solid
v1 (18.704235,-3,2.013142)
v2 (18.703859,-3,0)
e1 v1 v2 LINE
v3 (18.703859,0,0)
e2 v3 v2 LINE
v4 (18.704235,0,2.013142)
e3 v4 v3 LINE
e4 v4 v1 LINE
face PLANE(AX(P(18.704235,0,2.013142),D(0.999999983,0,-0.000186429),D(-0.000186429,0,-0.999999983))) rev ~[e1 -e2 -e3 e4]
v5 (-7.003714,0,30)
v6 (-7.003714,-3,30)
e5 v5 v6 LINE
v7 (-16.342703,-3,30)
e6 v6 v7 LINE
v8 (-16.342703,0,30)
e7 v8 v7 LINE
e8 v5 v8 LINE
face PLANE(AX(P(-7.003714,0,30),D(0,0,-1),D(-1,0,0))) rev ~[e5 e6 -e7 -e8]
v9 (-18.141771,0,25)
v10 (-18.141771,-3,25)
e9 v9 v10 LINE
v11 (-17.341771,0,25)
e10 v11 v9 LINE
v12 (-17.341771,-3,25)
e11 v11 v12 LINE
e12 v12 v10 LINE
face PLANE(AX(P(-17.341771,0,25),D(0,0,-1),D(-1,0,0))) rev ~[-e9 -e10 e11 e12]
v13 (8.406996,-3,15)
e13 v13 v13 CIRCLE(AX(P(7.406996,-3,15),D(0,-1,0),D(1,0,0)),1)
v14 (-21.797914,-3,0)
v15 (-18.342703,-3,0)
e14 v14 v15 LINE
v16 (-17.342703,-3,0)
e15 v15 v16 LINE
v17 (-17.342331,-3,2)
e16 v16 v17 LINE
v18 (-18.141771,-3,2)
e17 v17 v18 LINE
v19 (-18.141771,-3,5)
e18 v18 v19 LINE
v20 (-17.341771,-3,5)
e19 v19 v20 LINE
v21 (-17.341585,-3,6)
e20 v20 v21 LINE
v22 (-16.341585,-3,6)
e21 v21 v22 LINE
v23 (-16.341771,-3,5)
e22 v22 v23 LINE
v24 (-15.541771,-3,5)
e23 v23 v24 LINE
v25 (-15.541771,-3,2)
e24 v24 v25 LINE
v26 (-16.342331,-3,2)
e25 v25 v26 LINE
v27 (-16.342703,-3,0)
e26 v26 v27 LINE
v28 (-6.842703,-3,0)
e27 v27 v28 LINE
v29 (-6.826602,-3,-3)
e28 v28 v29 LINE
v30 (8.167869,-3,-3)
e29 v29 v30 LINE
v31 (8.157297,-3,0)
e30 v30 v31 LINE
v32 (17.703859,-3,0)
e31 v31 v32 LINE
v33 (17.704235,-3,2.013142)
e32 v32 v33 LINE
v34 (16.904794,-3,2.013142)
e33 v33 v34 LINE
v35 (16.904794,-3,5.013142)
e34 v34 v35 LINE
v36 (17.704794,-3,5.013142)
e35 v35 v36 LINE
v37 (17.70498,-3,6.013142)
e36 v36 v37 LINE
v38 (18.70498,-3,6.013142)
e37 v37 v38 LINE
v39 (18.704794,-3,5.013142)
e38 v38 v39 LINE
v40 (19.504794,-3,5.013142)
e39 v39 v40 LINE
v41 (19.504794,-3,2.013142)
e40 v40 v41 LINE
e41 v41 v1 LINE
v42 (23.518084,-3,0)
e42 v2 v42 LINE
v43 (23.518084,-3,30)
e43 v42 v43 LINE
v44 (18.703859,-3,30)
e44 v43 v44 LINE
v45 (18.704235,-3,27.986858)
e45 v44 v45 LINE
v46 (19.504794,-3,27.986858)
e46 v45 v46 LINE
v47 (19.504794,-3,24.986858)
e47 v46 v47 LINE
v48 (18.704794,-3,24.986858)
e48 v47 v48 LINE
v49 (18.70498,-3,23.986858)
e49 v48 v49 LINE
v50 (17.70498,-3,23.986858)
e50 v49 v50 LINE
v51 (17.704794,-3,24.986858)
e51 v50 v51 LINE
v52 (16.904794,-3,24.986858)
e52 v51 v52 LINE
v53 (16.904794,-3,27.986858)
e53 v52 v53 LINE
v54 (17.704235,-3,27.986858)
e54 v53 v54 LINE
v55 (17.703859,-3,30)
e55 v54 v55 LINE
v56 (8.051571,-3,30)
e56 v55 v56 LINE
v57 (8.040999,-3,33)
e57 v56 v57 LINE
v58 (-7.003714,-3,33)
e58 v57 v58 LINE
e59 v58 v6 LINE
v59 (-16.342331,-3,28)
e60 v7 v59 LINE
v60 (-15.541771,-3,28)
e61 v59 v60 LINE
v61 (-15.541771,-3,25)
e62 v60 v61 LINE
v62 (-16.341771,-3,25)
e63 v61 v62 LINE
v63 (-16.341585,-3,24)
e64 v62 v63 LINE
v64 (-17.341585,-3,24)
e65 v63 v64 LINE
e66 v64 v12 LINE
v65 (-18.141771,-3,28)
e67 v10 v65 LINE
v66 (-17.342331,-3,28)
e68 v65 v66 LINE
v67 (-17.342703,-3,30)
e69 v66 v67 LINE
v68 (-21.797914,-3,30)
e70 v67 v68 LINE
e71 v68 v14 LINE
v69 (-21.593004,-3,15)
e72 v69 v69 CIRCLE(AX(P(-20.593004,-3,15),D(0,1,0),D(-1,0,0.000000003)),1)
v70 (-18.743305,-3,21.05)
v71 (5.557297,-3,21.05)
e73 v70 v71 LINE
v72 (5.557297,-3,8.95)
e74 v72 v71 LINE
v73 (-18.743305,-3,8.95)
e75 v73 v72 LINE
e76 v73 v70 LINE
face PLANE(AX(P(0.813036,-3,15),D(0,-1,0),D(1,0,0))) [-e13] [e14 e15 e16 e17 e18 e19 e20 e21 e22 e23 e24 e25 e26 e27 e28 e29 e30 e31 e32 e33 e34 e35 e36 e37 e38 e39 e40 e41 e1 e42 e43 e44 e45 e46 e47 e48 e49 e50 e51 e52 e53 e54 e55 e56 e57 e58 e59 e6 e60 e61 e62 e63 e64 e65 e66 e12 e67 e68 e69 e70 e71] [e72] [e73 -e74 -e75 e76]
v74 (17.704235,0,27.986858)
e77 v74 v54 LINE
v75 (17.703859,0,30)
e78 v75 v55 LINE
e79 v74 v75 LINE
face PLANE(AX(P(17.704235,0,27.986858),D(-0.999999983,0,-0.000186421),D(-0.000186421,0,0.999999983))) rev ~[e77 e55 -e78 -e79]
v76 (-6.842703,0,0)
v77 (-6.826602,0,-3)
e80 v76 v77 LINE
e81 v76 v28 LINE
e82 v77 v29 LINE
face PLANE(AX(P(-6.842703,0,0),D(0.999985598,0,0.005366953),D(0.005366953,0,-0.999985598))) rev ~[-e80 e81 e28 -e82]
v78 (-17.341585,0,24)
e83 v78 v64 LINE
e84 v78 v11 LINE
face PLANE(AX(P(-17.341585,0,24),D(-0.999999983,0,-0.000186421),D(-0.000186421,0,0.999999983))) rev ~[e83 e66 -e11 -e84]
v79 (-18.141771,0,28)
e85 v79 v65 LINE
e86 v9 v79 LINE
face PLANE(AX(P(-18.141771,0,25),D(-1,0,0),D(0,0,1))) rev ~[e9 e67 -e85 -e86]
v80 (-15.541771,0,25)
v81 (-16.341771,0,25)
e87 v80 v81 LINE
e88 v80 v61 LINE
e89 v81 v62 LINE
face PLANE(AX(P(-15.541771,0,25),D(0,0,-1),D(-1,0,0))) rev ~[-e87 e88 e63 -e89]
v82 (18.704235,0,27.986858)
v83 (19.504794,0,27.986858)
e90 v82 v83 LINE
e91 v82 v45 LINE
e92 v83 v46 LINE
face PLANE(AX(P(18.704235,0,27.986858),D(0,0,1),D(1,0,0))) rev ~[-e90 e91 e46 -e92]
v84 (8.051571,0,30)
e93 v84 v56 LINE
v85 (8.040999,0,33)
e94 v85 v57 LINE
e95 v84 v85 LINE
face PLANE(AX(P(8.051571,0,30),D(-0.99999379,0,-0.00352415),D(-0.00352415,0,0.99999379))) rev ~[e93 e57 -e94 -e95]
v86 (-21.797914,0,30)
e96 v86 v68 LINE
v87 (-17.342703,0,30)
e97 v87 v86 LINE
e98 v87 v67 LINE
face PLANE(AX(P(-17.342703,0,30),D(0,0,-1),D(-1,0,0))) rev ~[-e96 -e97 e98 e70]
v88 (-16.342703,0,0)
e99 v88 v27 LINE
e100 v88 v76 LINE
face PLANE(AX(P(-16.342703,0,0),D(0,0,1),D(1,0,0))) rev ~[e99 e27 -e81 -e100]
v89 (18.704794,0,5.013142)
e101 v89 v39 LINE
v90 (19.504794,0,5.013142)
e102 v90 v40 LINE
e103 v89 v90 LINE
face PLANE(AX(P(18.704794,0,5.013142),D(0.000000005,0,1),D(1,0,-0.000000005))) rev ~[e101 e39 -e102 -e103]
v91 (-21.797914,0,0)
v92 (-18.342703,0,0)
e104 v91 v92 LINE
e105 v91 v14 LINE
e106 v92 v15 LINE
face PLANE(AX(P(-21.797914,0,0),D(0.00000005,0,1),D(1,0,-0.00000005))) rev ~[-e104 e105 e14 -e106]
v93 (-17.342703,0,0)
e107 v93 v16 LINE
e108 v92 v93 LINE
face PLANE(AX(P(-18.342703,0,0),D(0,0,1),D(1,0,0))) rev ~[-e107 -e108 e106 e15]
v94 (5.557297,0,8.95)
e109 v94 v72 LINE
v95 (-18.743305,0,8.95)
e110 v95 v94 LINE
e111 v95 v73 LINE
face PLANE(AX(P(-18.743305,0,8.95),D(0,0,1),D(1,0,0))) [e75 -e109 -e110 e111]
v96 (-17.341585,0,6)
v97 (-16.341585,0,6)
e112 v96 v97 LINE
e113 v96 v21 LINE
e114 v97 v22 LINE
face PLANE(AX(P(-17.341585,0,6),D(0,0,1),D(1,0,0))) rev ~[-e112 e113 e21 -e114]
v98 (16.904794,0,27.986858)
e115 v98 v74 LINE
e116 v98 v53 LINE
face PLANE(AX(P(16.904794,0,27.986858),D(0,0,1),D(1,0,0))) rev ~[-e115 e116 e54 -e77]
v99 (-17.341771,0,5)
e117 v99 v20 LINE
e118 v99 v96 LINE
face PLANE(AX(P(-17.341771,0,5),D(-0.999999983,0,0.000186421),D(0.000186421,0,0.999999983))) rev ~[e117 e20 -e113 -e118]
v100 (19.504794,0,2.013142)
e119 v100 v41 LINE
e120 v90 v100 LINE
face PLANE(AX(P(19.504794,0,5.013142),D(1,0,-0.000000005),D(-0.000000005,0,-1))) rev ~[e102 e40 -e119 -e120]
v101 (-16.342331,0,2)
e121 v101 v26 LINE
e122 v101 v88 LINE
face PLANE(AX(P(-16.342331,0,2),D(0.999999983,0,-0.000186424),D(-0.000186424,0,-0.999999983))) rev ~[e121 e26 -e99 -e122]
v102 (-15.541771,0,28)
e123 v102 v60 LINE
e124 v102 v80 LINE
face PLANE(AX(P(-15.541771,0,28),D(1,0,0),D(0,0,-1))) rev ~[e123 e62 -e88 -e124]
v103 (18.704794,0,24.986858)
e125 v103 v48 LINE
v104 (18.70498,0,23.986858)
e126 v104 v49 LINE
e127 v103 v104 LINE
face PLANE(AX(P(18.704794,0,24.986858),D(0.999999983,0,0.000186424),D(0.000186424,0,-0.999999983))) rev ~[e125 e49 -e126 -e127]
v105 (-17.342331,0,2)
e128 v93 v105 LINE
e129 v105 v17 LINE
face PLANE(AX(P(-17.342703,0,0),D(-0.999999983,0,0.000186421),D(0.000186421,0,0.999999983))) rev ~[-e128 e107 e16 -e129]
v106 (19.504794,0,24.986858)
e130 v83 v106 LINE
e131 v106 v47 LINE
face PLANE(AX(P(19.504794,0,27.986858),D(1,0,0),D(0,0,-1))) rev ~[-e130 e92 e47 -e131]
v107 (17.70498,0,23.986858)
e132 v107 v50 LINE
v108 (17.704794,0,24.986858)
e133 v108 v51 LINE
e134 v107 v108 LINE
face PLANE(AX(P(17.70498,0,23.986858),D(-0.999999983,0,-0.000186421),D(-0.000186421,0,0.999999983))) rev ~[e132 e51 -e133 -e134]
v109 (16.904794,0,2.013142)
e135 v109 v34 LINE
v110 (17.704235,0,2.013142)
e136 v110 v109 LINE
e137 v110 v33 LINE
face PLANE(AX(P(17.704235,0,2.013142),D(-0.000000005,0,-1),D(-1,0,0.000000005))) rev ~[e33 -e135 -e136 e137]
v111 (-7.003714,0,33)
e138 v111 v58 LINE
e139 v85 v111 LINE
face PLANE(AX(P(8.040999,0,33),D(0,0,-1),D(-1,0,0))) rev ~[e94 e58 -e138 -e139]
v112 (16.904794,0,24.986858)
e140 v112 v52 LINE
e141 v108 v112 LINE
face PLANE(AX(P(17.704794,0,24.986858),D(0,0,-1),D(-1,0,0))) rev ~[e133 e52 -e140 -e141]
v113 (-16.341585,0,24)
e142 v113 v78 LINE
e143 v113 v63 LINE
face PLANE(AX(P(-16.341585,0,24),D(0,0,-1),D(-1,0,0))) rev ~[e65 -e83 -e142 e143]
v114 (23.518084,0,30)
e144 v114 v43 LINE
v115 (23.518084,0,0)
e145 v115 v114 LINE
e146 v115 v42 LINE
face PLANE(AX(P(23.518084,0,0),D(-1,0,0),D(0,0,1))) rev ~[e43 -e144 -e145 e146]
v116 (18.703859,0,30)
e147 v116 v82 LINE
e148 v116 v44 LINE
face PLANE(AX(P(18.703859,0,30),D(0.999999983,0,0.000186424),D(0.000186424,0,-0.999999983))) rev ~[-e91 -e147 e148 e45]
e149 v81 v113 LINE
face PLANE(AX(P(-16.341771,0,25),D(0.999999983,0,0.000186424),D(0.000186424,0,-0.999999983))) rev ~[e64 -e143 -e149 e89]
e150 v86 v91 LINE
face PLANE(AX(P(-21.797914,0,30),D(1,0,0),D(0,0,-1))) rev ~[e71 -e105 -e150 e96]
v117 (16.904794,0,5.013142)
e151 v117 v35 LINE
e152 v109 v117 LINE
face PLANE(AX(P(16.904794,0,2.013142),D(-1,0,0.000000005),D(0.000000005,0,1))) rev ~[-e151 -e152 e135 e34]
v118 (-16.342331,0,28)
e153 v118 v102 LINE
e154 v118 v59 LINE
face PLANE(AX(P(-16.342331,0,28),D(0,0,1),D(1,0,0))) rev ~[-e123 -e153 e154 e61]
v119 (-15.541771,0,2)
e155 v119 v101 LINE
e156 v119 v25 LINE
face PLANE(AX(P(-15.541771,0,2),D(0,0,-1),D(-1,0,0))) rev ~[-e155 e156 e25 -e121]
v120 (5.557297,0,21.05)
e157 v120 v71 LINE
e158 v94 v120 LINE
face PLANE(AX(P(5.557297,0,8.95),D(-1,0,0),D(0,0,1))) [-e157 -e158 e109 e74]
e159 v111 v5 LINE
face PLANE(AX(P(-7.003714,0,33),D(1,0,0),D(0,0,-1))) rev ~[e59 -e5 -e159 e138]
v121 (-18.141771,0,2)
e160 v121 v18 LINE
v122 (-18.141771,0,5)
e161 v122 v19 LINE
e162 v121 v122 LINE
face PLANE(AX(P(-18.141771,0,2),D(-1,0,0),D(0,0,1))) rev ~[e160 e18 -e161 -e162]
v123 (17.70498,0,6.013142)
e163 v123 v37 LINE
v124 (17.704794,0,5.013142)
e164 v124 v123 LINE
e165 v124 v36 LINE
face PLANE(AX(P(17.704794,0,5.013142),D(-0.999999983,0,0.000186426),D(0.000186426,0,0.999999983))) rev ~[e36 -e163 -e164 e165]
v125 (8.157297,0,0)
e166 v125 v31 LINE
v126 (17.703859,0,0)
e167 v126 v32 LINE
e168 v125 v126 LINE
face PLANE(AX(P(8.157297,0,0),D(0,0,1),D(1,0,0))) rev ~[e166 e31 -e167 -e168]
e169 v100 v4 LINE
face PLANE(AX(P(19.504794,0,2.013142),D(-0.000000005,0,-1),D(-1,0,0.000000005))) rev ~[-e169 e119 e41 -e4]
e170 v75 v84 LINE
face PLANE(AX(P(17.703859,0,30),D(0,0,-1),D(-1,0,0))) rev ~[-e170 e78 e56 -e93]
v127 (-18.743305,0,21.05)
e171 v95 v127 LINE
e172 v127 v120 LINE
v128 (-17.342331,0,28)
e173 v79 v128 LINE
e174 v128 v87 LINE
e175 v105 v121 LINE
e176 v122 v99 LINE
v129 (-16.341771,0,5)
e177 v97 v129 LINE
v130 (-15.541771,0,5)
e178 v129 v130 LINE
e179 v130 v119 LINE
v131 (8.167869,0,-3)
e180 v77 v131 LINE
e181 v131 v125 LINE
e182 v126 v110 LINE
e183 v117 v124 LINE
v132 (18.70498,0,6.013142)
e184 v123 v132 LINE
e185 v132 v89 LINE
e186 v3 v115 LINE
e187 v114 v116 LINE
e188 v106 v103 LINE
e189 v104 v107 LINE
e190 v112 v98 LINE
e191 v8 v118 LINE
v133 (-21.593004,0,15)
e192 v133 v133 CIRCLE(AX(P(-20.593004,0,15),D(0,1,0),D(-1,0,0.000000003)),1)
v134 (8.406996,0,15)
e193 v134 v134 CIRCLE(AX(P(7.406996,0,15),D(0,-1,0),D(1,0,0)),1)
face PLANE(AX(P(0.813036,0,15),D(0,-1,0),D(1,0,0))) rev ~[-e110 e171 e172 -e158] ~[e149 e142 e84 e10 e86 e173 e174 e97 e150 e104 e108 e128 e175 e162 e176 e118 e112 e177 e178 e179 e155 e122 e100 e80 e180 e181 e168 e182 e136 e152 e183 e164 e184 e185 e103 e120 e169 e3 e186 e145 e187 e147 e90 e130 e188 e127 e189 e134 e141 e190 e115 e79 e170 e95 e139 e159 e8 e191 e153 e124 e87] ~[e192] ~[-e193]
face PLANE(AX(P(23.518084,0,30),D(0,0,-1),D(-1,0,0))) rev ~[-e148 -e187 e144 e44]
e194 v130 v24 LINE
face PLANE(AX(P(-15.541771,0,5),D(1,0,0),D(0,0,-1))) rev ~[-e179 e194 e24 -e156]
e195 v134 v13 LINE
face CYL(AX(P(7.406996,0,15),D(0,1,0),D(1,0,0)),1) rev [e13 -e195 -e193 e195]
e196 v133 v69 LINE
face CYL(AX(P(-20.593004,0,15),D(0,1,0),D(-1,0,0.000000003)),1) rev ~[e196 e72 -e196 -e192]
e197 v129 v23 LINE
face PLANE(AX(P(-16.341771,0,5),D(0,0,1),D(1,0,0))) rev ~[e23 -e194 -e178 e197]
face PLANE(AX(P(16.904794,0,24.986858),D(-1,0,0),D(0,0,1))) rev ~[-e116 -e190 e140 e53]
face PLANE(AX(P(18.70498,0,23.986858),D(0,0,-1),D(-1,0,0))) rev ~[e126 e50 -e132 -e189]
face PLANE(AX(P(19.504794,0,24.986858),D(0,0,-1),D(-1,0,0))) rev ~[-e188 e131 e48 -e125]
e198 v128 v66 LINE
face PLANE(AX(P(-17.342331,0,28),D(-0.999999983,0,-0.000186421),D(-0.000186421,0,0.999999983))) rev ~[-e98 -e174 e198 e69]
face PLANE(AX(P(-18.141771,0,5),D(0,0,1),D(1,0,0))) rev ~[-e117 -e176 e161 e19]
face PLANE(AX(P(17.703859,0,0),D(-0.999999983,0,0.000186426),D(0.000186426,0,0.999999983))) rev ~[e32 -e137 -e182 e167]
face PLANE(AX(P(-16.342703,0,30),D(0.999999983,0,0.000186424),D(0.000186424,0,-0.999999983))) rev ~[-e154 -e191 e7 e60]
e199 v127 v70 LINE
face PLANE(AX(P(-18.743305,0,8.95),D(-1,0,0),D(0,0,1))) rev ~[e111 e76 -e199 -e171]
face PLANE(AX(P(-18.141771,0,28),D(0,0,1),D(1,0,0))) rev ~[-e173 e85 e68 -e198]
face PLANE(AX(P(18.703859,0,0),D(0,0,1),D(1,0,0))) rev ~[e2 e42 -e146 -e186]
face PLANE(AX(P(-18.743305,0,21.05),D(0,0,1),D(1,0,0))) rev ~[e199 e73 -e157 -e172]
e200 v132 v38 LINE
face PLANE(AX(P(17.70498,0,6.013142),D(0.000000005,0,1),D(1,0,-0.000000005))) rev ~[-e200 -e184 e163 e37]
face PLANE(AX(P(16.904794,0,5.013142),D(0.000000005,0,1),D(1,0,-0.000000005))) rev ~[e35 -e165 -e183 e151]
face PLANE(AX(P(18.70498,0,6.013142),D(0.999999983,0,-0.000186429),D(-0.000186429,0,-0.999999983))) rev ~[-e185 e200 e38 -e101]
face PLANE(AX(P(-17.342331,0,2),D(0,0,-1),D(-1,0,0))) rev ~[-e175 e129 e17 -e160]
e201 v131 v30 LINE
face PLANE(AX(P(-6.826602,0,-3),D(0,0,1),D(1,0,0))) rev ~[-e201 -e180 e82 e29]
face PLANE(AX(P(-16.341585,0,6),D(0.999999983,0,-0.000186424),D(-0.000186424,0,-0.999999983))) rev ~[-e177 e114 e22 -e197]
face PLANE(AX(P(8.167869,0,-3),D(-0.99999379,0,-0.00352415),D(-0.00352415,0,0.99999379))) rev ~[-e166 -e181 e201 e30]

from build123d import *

# Parameters (mm, degrees)
F3_W     = 24.3006017764
F3_H     = 12.100000065
F3_R     = 1
F4_DEPTH = 3


# Not quite as in the source:
# - ends of sketch curves that miss each other by under 0.0002 mm in the source are joined


with BuildPart() as f4:
    # F3 (on Front) → F4 (new body)
    with BuildSketch(Plane.XZ):
        Polygon((-18.3427034128, 0), (-17.3427034128, 0), (-17.3423305717, 1.9999998262), (-18.1417713099, 1.9999998262), (-18.1417713099, 4.9999998262), (-17.3417713099, 4.9999998262), (-17.3415848893, 5.9999998262), (-16.3415848684, 5.9999998262), (-16.3417712925, 4.9999998262), (-15.5417712925, 4.9999998262), (-15.5417712925, 1.9999998262), (-16.3423305647, 1.9999998262), (-16.3427034128, 0), (-15.3427034128, 0), (-6.8427034128, 0), (8.1310835591, 0), (8.1572965872, 0), (16.6572965872, 0), (17.7038592511, 0), (17.704234553, 2.0131421474), (16.9047938148, 2.0131421517), (16.9047938308, 5.0131421517), (17.7047938308, 5.0131421475), (17.7049802567, 6.0131421474), (18.7049802776, 6.0131421421), (18.7047938482, 5.0131421421), (19.5047938482, 5.0131421378), (19.5047938321, 2.0131421378), (18.7042345599, 2.0131421421), (18.703859251, 0), (19.6572965872, 0), (23.5180836171, 0), (23.5180836171, 30), (18.7038593313, 30), (18.7042346294, 27.9868579887), (19.5047939016, 27.9868579887), (19.5047939016, 24.9868579887), (18.7047939016, 24.9868579887), (18.7049803257, 23.9868579887), (17.7049803048, 23.9868579887), (17.7047938842, 24.9868579887), (16.9047938842, 24.9868579887), (16.9047938842, 27.9868579887), (17.7042346225, 27.9868579887), (17.7038593313, 30), (8.0515714362, 30), (0, 30), (-7.0037143305, 30), (-16.3427034128, 30), (-16.3423305647, 28.0000001738), (-15.5417712925, 28.0000001738), (-15.5417712925, 25.0000001738), (-16.3417712925, 25.0000001738), (-16.3415848684, 24.0000001738), (-17.3415848893, 24.0000001738), (-17.3417713099, 25.0000001738), (-18.1417713099, 25.0000001738), (-18.1417713099, 28.0000001738), (-17.3423305717, 28.0000001738), (-17.3427034128, 30), (-21.7979144805, 30), (-21.7979144805, 28.0000001738), (-21.7979144805, 25.0000001738), (-21.7979144805, 24.0000001738), (-21.7979144805, 15.0000001738), (-21.7979144805, 1.738e-07), align=None)
        with BuildLine():
            ThreePointArc((-19.593004301, 15.0000001705), (-20.5930043024, 14.0000001705), (-21.593004301, 15.0000001732))
            ThreePointArc((-21.593004301, 15.0000001732), (-20.5930042997, 16.0000001705), (-19.593004301, 15.0000001705))
        make_face(mode=Mode.SUBTRACT)
        with Locations((-6.593004301, 15.0000001331)):
            Rectangle(F3_W, F3_H, mode=Mode.SUBTRACT)
        with Locations((7.406995699, 15.0000000956)):
            Circle(F3_R, mode=Mode.SUBTRACT)
        Polygon((-7.0037143305, 33), (-7.0037143305, 30), (0, 30), (8.0515714362, 30), (8.0409989211, 33), align=None)
        Polygon((8.1310835591, 0), (-6.8427034128, 0), (-6.826602321, -3), (0, -3), (8.1678691023, -3), (8.1572965872, 0), align=None)
    extrude(amount=F4_DEPTH)


solid = f4.part
